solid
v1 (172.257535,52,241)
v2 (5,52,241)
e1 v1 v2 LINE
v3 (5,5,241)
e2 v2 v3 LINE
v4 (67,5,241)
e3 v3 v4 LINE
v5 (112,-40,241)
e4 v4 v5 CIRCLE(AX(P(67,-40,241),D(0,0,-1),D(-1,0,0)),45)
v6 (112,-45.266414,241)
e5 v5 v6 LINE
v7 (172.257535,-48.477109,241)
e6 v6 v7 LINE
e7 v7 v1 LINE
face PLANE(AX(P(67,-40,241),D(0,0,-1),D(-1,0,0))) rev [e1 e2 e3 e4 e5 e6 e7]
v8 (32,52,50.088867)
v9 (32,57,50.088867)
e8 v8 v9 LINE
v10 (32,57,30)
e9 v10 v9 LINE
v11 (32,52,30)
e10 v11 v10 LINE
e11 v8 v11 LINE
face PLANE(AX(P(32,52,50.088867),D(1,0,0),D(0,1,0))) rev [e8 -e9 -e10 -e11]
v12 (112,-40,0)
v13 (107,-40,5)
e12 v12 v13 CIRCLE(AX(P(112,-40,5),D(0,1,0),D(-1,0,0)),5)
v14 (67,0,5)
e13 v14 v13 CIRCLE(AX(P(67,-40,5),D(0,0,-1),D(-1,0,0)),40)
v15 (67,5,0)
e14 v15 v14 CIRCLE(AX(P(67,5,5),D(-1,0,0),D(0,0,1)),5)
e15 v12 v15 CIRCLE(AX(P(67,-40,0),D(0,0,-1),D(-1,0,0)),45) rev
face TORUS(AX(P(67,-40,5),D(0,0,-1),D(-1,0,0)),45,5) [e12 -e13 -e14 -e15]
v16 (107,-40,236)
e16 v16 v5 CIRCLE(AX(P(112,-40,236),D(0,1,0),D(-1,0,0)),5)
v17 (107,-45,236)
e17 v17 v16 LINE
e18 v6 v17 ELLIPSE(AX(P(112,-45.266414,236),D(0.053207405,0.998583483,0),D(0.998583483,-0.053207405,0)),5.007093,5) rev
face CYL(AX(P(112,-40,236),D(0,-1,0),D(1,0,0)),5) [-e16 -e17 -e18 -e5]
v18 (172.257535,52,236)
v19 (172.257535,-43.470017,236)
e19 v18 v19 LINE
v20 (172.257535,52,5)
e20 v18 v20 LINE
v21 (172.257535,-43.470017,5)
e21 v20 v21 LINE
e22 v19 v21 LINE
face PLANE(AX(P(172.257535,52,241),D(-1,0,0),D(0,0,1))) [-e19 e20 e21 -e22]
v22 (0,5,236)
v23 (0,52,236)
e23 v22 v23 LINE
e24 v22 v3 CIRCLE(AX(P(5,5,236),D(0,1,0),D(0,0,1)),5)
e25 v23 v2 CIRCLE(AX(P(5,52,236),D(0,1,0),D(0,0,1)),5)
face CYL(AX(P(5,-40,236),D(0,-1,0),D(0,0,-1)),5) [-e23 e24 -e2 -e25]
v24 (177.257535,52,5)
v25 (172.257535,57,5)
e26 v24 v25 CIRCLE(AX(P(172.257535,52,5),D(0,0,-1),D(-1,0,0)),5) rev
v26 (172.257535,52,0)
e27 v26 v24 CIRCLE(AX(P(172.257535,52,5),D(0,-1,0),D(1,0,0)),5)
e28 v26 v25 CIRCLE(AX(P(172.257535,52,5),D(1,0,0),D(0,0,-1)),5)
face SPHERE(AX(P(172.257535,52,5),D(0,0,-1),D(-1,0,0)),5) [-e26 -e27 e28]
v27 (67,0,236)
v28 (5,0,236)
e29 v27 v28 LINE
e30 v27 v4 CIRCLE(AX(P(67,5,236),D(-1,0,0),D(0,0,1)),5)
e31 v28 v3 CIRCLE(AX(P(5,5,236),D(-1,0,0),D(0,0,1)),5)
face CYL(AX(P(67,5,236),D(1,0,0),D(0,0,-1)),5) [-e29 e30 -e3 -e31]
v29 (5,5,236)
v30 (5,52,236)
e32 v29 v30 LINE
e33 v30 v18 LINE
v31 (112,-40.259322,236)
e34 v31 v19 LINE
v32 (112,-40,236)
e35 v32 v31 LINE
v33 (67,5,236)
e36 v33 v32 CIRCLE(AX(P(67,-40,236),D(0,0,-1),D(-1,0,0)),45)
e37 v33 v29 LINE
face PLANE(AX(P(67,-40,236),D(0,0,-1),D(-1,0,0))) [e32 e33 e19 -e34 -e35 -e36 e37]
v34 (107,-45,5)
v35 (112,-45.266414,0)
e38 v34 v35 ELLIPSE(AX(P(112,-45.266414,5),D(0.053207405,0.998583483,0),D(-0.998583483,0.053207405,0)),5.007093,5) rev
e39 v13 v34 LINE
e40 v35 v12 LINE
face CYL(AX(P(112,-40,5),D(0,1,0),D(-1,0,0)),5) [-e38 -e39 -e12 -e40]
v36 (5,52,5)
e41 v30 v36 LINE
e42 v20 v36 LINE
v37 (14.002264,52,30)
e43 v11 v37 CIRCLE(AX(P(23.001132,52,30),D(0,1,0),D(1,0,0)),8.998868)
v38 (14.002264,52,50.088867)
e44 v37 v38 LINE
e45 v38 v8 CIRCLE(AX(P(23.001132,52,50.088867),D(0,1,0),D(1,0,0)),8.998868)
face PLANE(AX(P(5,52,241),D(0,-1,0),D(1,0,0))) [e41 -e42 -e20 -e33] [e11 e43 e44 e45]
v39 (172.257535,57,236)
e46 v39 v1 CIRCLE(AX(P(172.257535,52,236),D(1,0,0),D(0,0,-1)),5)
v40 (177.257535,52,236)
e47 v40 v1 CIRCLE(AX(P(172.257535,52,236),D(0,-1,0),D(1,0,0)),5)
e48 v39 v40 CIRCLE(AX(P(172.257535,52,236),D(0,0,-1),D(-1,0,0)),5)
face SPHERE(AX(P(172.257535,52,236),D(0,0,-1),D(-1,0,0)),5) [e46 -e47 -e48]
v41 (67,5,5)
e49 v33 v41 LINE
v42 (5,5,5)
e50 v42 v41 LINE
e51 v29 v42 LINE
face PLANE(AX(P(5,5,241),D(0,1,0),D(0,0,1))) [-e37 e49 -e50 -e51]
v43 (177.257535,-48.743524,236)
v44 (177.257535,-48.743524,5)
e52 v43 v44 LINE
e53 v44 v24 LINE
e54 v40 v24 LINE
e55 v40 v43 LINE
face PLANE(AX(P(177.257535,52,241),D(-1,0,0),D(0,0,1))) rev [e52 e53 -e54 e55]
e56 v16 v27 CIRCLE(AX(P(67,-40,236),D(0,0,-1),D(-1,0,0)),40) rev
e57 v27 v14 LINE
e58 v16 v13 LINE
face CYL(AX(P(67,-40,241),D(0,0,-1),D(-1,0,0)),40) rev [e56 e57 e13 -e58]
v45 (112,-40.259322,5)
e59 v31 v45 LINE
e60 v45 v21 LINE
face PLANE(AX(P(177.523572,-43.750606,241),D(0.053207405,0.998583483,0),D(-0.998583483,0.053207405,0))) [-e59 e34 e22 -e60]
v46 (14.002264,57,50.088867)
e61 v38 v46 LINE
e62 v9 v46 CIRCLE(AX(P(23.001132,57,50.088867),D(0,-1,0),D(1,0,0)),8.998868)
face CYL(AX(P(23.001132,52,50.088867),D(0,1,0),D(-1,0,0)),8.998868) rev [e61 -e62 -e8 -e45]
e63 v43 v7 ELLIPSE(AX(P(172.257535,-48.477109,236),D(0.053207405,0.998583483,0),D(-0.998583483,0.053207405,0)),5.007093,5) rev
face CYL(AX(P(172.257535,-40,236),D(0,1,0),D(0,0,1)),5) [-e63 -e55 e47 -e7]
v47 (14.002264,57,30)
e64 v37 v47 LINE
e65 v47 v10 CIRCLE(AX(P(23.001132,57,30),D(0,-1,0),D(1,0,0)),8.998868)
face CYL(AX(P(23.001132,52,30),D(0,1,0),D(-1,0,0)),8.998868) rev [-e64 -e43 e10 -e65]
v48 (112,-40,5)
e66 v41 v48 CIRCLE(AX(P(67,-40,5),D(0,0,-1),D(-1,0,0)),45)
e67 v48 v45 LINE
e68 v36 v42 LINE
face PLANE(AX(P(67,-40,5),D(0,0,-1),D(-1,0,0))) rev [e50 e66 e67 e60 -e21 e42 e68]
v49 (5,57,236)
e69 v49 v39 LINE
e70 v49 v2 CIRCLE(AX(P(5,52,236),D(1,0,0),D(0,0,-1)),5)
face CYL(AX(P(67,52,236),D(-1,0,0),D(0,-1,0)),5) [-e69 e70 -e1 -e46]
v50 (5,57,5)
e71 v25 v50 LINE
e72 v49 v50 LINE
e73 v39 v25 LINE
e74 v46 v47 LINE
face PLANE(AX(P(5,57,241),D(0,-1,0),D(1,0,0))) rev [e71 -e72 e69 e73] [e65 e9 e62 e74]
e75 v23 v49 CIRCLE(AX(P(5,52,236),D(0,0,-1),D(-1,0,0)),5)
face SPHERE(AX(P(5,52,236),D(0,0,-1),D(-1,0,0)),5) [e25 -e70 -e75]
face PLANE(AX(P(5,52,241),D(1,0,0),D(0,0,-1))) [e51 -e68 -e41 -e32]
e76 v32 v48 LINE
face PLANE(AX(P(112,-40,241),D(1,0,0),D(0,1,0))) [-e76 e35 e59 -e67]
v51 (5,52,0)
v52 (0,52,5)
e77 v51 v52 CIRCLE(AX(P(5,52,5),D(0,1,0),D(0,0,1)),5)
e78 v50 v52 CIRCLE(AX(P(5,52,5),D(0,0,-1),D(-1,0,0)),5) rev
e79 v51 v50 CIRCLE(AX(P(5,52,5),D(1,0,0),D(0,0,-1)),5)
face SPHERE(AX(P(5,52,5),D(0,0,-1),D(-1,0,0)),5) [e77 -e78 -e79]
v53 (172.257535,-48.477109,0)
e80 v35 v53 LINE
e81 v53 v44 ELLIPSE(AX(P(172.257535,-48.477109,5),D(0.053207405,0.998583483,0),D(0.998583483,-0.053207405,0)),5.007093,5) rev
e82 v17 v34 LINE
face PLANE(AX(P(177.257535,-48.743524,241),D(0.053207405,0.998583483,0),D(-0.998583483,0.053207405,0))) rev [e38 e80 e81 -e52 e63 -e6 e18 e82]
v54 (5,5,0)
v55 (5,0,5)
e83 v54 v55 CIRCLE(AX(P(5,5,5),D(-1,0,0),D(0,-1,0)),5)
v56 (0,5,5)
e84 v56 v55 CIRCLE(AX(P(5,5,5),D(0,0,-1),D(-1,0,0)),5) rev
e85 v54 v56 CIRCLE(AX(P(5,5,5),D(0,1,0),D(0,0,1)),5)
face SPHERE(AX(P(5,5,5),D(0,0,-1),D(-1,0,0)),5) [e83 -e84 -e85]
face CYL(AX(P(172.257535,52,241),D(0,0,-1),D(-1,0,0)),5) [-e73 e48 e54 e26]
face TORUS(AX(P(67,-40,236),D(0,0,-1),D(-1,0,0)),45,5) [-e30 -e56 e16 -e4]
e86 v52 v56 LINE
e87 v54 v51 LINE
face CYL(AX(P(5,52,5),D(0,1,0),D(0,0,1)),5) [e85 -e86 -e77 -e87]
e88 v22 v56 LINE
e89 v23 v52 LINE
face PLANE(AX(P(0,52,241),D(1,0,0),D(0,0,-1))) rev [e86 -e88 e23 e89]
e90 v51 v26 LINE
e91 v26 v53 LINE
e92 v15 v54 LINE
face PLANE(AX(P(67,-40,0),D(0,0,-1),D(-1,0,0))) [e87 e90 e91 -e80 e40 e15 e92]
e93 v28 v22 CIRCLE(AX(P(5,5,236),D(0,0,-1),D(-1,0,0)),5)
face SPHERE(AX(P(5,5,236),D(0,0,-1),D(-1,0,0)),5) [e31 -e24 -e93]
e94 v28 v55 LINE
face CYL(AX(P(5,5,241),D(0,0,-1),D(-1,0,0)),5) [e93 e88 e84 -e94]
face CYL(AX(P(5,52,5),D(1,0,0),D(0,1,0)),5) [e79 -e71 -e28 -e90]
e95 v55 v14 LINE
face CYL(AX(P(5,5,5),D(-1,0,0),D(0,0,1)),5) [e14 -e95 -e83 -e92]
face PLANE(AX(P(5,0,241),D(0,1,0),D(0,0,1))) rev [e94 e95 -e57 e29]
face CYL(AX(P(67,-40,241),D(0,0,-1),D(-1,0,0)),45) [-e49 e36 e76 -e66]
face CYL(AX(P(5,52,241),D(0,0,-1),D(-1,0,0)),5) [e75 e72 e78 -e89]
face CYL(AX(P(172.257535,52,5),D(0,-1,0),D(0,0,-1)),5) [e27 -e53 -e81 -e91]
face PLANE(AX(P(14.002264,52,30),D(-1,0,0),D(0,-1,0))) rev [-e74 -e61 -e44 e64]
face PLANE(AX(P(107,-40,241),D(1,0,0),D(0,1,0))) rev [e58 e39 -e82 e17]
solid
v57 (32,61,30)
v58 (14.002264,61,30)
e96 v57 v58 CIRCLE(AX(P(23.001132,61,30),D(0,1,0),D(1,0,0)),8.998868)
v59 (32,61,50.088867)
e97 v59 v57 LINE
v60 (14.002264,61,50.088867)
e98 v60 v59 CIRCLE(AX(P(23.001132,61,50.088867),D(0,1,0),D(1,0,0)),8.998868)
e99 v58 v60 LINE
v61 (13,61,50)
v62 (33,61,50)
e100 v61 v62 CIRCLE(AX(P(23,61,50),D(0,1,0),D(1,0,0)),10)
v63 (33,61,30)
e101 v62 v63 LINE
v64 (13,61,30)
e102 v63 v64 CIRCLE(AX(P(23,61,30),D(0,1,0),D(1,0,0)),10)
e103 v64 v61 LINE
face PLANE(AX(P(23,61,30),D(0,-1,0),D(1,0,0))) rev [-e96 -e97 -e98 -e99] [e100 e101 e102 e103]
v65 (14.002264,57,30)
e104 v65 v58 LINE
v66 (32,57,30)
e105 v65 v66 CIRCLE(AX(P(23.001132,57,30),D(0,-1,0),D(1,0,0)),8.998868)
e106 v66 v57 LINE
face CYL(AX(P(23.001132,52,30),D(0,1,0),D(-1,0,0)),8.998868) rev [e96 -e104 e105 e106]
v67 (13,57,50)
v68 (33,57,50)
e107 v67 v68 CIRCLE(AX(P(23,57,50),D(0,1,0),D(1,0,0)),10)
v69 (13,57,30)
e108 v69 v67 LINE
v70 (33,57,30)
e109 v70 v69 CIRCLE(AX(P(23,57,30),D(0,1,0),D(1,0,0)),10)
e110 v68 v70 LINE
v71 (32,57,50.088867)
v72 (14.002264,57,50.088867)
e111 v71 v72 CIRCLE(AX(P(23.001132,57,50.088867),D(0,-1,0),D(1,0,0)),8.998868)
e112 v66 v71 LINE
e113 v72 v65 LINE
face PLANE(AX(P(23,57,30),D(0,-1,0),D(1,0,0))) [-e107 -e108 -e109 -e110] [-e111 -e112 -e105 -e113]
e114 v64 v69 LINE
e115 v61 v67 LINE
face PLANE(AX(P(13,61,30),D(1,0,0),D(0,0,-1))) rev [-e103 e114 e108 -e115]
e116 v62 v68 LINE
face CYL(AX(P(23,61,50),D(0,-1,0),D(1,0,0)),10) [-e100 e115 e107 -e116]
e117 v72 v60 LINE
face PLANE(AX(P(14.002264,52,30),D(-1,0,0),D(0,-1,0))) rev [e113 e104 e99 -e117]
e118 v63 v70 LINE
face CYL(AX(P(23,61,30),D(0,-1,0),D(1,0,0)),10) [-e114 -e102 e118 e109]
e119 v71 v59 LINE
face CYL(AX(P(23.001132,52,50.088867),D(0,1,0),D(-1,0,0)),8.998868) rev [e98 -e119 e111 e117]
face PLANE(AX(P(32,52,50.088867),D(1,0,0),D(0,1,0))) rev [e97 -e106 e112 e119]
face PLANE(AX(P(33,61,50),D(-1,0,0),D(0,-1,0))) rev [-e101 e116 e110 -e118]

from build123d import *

# Parameters (mm, degrees)
BOSS_EXTRU_1_DEPTH      = 241
CONG_1_R                = 5
BOSS_EXTRU_2_DEPTH      = 4
ENL_V_MAT_EXTRU_2_DEPTH = 9
COQUE1_START            = 5
COQUE1_DEPTH            = 231


# Read off the part's stored shape, not the designer's step: Coque1
with BuildPart() as part:
    # Esquisse1 → Boss.-Extru.1 (new body)
    with BuildSketch(Plane.XY):
        with BuildLine():
            Line((5, 0), (67, 0))
            ThreePointArc((67, 0), (95.284271247, -11.715728753), (107, -40))
            Line((107, -40), (107, -45))
            Line((107, -45), (177.257535232, -48.743523889))
            Line((177.257535232, -48.743523889), (177.257535232, 52))
            ThreePointArc((177.257535232, 52), (175.793069138, 55.535533906), (172.257535232, 57))
            Line((172.257535232, 57), (5, 57))
            ThreePointArc((5, 57), (1.464466094, 55.535533906), (0, 52))
            Line((0, 52), (0, 5))
            ThreePointArc((0, 5), (1.464466094, 1.464466094), (5, 0))
        make_face()
    extrude(amount=BOSS_EXTRU_1_DEPTH)

    # Congé1
    cong_1_edges = [part.edges().sort_by_distance(p)[0] for p in [
        (107, -42.5, 0),
        (95.284271247, -11.715728753, 0),
        (36, 0, 0),
        (1.464466094, 1.464466094, 0),
        (0, 28.5, 0),
        (1.464466094, 55.535533906, 0),
        (88.628767616, 57, 0),
        (107, -42.5, 241),
        (95.284271247, -11.715728753, 241),
        (36, 0, 241),
        (0, 28.5, 241),
        (88.628767616, 57, 241),
        (177.257535232, 1.628238056, 0),
        (177.257535232, 1.628238056, 241),
    ]]
    fillet(cong_1_edges, radius=CONG_1_R)


with BuildPart() as body_2:
    # Esquisse3 → Boss.-Extru.2 (new body)
    with BuildSketch(Plane(origin=(0, 57, 0), x_dir=(1, 0, 0), z_dir=(0, 1, 0))):
        with BuildLine():
            Line((13, -30), (13, -50))
            ThreePointArc((13, -50), (23, -60), (33, -50))
            Line((33, -50), (33, -30))
            ThreePointArc((33, -30), (23, -20), (13, -30))
        make_face()
    extrude(amount=BOSS_EXTRU_2_DEPTH)


with BuildPart() as enl_v_mat_extru_2_tool:
    # Esquisse5 → Enlèv. mat.-Extru.2 (new body)
    with BuildSketch(Plane(origin=(0, 61, 0), x_dir=(1, 0, 0), z_dir=(0, 1, 0))):
        with BuildLine():
            Line((14.002264258, -30), (14.002264258, -50.088867222))
            ThreePointArc((14.002264258, -50.088867222), (23.001132129, -59.087735093), (32, -50.088867222))
            Line((32, -50.088867222), (32, -30))
            ThreePointArc((32, -30), (23.001132129, -21.001132129), (14.002264258, -30))
        make_face()
    extrude(amount=-ENL_V_MAT_EXTRU_2_DEPTH)


with BuildPart() as part_1:
    add(part.part)

    # Enlèv. mat.-Extru.2: cut by enl_v_mat_extru_2_tool
    add(enl_v_mat_extru_2_tool.part, mode=Mode.SUBTRACT)

    # Coque1 outline → Coque1 (cut)
    with BuildSketch(Plane.XY.offset(COQUE1_START)):
        with BuildLine():
            Line((172.257535232, 52), (5, 52))
            Line((5, 52), (5, 5))
            Line((5, 5), (67, 5))
            ThreePointArc((67, 5), (98.819805153, -8.180194847), (112, -40))
            Line((112, -40), (112, -40.259321772))
            Line((112, -40.259321772), (172.257535232, -43.470016851))
            Line((172.257535232, -43.470016851), (172.257535232, 52))
        make_face()
    extrude(amount=COQUE1_DEPTH, mode=Mode.SUBTRACT)


with BuildPart() as body_2_1:
    add(body_2.part)

    # Enlèv. mat.-Extru.2: cut by enl_v_mat_extru_2_tool
    add(enl_v_mat_extru_2_tool.part, mode=Mode.SUBTRACT)


solid = Compound([part_1.part, body_2_1.part])
